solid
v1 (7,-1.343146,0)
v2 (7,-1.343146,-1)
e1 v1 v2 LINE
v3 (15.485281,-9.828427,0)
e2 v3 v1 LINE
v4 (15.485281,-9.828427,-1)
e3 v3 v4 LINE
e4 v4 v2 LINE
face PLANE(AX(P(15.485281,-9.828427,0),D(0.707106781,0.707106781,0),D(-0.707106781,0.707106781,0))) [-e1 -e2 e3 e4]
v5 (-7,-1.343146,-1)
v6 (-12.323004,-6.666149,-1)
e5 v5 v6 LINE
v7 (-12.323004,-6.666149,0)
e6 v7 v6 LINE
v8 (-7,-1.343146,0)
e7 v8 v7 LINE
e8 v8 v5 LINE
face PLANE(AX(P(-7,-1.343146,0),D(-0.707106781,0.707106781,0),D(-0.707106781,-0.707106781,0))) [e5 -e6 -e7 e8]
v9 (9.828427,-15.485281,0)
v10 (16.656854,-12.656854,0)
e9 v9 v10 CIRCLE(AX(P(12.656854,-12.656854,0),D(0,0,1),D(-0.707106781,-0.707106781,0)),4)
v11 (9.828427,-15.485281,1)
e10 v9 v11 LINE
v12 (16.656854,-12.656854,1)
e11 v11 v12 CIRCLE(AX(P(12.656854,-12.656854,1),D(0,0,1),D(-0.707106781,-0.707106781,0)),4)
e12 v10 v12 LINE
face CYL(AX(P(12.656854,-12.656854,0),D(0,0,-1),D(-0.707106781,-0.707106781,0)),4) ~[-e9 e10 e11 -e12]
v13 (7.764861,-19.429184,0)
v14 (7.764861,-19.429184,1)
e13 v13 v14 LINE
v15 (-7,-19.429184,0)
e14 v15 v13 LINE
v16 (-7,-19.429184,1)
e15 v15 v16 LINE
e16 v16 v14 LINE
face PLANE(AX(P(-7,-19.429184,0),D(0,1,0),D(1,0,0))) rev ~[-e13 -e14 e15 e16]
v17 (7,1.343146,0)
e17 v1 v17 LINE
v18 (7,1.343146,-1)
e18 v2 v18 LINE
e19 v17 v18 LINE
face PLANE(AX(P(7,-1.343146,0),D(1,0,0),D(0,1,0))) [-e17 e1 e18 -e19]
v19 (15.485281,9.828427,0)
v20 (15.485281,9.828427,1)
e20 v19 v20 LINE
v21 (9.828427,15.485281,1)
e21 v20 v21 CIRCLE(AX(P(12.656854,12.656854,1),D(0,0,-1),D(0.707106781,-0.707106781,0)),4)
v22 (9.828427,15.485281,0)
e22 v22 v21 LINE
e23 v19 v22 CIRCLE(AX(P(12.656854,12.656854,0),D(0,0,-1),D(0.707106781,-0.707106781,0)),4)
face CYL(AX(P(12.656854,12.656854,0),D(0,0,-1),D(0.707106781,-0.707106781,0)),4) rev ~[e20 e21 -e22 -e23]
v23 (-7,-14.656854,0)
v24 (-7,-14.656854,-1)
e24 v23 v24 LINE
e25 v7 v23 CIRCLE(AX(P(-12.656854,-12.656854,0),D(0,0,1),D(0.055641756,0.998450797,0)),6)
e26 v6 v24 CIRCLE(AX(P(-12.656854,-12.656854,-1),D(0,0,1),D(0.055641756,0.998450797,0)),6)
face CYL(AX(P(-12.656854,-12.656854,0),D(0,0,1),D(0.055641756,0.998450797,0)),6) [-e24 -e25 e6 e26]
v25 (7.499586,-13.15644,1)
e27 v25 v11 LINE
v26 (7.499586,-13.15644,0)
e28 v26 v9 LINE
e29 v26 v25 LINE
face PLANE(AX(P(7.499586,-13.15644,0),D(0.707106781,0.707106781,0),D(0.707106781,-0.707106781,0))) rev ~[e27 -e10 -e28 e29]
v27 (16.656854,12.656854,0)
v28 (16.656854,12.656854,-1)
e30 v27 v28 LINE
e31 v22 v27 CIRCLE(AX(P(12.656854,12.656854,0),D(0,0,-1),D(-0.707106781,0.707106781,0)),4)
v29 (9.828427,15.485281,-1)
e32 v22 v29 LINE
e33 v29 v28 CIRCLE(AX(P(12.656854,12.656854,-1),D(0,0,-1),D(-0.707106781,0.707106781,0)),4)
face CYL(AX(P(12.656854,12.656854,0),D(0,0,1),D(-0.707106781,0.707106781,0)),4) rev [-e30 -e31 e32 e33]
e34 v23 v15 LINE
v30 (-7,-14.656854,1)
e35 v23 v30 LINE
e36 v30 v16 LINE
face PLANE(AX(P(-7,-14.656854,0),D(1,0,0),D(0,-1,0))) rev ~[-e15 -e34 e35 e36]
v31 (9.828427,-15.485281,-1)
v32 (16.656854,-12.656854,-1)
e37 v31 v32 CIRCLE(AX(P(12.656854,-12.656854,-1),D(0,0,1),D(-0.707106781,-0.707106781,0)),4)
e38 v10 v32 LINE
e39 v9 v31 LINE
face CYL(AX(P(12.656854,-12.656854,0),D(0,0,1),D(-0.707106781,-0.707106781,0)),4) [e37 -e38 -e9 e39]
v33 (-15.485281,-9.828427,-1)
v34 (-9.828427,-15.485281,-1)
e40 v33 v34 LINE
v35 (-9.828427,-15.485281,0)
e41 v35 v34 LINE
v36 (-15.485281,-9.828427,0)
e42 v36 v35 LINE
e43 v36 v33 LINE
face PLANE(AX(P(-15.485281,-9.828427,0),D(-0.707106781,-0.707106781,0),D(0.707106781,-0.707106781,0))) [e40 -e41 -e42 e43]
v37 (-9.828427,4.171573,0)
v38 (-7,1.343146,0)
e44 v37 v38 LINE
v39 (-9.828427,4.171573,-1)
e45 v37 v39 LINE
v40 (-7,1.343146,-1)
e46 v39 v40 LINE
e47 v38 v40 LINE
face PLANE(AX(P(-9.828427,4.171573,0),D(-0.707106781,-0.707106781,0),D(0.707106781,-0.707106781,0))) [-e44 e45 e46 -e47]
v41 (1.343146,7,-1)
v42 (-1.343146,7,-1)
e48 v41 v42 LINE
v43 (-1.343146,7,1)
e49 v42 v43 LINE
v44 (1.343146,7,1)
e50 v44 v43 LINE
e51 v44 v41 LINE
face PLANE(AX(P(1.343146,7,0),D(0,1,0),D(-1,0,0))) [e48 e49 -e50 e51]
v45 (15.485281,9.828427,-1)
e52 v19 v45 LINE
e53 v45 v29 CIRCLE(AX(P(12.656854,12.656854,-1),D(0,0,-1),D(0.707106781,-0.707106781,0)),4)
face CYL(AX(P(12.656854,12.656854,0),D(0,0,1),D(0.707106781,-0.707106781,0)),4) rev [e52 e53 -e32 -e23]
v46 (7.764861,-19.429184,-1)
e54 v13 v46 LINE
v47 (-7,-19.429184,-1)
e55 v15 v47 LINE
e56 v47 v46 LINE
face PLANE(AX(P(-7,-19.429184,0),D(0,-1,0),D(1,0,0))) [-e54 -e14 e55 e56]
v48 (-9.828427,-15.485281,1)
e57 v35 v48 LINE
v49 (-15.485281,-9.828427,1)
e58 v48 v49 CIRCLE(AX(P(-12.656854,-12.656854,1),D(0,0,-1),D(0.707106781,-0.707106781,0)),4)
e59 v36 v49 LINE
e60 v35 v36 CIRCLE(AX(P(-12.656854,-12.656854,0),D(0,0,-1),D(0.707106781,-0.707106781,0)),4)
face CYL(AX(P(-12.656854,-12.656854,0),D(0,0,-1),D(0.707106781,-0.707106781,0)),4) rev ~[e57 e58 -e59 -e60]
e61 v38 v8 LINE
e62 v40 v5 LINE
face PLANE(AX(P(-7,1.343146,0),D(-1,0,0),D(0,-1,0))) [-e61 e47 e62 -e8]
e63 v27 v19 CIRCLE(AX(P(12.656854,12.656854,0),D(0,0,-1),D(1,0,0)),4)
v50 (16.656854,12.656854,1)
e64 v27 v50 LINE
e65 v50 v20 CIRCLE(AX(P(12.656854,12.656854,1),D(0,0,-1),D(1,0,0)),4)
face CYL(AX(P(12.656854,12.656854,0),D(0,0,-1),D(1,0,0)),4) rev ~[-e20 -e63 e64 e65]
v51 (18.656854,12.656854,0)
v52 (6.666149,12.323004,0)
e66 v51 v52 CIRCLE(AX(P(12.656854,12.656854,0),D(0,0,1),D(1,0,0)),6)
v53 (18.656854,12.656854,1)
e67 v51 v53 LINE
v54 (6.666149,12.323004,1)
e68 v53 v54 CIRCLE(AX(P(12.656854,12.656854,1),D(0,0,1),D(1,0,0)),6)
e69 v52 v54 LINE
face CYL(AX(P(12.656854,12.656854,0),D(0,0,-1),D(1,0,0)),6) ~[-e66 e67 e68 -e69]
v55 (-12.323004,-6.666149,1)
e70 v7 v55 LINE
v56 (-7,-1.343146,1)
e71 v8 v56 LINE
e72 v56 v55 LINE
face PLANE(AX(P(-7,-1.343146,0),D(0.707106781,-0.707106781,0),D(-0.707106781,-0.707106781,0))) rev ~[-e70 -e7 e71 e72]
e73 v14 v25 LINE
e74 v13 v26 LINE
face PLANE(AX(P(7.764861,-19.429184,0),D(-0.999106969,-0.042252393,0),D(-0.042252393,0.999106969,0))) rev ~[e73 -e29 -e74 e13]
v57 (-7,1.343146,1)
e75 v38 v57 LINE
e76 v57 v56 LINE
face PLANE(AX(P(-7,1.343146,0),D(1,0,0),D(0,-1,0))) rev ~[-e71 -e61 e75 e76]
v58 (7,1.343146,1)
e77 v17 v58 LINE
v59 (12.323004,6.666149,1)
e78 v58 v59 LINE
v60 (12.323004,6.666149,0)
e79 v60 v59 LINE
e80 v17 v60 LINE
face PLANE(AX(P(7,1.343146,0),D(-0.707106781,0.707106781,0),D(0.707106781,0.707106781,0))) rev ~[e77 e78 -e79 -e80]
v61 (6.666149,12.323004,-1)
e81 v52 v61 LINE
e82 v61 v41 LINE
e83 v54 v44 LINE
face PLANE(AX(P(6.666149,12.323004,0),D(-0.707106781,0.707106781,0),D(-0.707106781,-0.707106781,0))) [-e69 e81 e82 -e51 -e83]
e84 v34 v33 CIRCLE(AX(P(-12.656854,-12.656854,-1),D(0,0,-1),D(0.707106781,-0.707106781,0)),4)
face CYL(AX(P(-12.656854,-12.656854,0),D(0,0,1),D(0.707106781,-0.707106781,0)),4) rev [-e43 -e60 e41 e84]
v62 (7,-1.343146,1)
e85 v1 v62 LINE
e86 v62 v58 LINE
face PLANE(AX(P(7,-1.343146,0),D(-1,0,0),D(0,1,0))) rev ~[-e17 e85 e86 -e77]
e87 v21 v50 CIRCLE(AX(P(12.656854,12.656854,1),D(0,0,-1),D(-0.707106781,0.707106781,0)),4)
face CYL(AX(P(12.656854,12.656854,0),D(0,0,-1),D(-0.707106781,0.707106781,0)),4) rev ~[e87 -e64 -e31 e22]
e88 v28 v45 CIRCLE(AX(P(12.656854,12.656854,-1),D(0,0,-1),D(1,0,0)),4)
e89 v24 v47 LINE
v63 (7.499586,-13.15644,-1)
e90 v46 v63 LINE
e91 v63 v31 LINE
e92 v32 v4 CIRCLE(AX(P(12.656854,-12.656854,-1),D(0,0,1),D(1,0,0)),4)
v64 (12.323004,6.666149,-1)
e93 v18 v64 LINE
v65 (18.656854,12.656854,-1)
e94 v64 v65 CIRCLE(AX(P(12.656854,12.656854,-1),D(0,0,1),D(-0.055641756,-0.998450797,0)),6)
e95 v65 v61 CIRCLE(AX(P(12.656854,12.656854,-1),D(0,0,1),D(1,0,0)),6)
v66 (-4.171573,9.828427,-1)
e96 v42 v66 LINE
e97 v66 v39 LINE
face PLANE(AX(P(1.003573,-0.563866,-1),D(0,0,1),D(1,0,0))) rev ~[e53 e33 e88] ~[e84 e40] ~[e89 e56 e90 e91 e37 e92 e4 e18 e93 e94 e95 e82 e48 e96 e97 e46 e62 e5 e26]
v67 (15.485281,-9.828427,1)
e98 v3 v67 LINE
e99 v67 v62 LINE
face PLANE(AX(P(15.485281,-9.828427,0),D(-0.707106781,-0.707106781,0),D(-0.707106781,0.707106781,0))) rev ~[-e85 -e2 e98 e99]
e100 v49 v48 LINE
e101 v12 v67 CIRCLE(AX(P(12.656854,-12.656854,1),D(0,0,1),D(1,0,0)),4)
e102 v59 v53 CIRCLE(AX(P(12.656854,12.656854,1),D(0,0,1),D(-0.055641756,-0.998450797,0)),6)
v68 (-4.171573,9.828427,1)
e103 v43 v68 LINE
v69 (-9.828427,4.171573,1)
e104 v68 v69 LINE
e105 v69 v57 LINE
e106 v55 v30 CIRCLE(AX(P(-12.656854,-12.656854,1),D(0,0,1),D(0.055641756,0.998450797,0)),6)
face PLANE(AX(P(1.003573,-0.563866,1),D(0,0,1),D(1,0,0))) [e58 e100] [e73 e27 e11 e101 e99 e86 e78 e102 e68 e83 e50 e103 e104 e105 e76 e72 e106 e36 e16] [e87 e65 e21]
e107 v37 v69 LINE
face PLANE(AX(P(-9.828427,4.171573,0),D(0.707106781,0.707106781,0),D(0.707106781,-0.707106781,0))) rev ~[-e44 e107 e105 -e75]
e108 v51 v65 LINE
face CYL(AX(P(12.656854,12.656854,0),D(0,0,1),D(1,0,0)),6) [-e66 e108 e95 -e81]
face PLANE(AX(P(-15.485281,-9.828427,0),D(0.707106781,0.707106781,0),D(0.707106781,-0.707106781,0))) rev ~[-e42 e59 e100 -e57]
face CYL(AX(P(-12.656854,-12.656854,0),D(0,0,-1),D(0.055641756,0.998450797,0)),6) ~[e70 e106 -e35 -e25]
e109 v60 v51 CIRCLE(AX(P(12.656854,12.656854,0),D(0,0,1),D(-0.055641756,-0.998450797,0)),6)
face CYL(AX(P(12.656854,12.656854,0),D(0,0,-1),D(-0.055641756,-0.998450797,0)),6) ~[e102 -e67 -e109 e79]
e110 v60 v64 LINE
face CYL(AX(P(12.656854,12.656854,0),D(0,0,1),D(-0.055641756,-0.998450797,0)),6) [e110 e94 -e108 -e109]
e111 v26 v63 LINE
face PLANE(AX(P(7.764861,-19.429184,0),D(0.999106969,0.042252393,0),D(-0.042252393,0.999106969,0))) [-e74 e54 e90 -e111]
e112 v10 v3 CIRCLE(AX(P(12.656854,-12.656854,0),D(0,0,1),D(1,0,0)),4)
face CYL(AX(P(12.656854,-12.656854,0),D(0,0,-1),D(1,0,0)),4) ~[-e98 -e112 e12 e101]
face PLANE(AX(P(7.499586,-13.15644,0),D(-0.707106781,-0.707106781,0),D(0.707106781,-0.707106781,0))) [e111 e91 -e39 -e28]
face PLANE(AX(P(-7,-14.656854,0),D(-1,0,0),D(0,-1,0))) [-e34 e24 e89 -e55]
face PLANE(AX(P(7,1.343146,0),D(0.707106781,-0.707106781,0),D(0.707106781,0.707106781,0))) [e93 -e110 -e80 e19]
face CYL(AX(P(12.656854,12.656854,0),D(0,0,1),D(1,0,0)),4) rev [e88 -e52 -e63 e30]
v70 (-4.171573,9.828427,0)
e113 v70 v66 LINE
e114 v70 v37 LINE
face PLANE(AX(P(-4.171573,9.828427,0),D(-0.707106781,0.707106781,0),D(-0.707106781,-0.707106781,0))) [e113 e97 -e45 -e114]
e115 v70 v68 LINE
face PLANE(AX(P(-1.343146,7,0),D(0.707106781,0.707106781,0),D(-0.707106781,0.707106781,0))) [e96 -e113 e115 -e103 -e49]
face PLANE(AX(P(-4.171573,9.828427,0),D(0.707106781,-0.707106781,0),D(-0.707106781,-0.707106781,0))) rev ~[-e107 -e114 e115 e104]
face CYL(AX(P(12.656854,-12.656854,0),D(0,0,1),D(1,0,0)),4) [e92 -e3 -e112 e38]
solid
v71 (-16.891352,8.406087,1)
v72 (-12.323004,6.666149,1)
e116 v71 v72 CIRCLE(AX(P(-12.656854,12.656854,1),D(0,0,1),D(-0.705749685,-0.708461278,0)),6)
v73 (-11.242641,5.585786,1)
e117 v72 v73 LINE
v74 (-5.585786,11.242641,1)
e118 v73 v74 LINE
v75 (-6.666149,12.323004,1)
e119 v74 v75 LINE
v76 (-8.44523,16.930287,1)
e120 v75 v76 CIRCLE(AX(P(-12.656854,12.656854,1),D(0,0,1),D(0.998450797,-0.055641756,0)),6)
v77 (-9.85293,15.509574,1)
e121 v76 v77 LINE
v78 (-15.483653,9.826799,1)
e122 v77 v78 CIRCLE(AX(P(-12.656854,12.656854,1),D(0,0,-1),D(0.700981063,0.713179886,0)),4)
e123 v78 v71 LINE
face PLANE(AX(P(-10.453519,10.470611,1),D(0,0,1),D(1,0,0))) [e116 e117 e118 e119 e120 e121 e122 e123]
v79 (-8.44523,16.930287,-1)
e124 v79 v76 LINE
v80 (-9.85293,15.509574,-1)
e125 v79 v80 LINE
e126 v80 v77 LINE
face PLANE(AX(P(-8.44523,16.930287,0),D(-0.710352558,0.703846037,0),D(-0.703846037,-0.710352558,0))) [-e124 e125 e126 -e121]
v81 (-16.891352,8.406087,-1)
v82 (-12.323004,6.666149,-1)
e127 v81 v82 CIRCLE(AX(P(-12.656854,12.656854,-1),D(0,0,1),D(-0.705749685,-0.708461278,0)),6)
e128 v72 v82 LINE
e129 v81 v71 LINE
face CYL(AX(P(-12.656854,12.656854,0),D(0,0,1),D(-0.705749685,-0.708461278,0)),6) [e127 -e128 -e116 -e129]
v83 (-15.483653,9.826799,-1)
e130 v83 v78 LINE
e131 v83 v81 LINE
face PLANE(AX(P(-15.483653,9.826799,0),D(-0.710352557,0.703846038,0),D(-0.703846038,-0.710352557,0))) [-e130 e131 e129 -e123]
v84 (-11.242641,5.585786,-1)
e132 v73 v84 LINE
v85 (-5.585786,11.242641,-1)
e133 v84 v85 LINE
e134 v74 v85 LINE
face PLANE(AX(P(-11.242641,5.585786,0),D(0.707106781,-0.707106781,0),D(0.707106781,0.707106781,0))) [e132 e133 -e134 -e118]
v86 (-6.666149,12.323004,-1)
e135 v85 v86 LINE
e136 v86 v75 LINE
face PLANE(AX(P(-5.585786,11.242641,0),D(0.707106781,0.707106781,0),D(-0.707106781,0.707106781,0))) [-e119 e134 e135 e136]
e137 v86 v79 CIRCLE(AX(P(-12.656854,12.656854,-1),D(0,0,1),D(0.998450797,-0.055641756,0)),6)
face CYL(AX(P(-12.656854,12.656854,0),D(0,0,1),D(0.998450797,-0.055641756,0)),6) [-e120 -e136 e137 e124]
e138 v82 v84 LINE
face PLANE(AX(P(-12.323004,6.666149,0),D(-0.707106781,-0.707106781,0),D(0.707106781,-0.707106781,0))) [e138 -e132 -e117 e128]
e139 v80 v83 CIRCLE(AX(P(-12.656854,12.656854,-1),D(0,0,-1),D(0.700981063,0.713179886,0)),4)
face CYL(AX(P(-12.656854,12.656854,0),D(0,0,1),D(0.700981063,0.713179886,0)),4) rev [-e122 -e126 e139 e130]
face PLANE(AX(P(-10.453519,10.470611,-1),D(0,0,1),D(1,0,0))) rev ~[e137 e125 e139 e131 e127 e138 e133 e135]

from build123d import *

# Parameters (mm, degrees)
F1_DEPTH = 1


# Not quite as in the source:
# - ends of sketch curves that miss each other by under 0.0002 mm in the source are joined


with BuildPart() as f1:
    # F0 (on Top) → F1 (new body, symmetric)
    with BuildSketch(Plane.XY):
        with BuildLine():
            Line((1.3431457505, 7), (-1.3431457505, 7))
            Line((-1.3431457505, 7), (-4.1715728753, 9.8284271247))
            Line((-4.1715728753, 9.8284271247), (-9.8284271247, 4.1715728753))
            Line((-9.8284271247, 4.1715728753), (-7, 1.3431457505))
            Line((-7, 1.3431457505), (-7, -1.3431457505))
            Line((-7, -1.3431457505), (-7, -12.6568542495))
            Line((-7, -12.6568542495), (-6.6661494646, -12.3230037141))
            Line((-6.6661494646, -12.3230037141), (-1.3431457505, -7))
            Line((-1.3431457505, -7), (1.3431457505, -7))
            Line((1.3431457505, -7), (7.4995861066, -13.1564403561))
            Line((7.4995861066, -13.1564403561), (7, -1.3431457505))
            Line((7, -1.3431457505), (7, 1.3431457505))
            Line((7, 1.3431457505), (12.3230037141, 6.6661494646))
            ThreePointArc((12.3230037141, 6.6661494646), (8.4142135624, 8.4142135624), (6.6661494646, 12.3230037141))
            Line((6.6661494646, 12.3230037141), (1.3431457505, 7))
        make_face()
        with BuildLine():
            ThreePointArc((18.6568542495, 12.6568542495), (12.4898642939, 18.6545299955), (6.6661494646, 12.3230037141))
            Line((6.6661494646, 12.3230037141), (9.8284271247, 15.4852813742))
            ThreePointArc((9.8284271247, 15.4852813742), (14.187587979, 16.3523723795), (16.6568542495, 12.6568542495))
            ThreePointArc((16.6568542495, 12.6568542495), (16.3523723795, 11.12612052), (15.4852813742, 9.8284271247))
            Line((15.4852813742, 9.8284271247), (12.3230037141, 6.6661494646))
            ThreePointArc((12.3230037141, 6.6661494646), (16.7797717109, 8.2977773281), (18.6568542495, 12.6568542495))
        make_face()
        with BuildLine():
            Line((9.8284271247, 15.4852813742), (6.6661494646, 12.3230037141))
            ThreePointArc((6.6661494646, 12.3230037141), (8.4142135624, 8.4142135624), (12.3230037141, 6.6661494646))
            Line((12.3230037141, 6.6661494646), (15.4852813742, 9.8284271247))
            ThreePointArc((15.4852813742, 9.8284271247), (9.8284271247, 9.8284271247), (9.8284271247, 15.4852813742))
        make_face()
        Polygon((-7, -12.6568542495), (-7, -1.3431457505), (-12.3230037141, -6.6661494646), (-15.4852813742, -9.8284271247), (-9.8284271247, -15.4852813742), align=None)
        with BuildLine():
            Line((15.4852813742, -9.8284271247), (7, -1.3431457505))
            Line((7, -1.3431457505), (7.4995861066, -13.1564403561))
            Line((7.4995861066, -13.1564403561), (9.8284271247, -15.4852813742))
            ThreePointArc((9.8284271247, -15.4852813742), (9.8284271247, -9.8284271247), (15.4852813742, -9.8284271247))
        make_face()
        with BuildLine():
            Line((-15.4852813742, -9.8284271247), (-12.3230037141, -6.6661494646))
            ThreePointArc((-12.3230037141, -6.6661494646), (-17.6503476854, -15.9832672282), (-7, -14.6568542495))
            Line((-7, -14.6568542495), (-7, -12.6568542495))
            Line((-7, -12.6568542495), (-9.8284271247, -15.4852813742))
            ThreePointArc((-9.8284271247, -15.4852813742), (-15.4852813742, -15.4852813742), (-15.4852813742, -9.8284271247))
        make_face()
        with BuildLine():
            Line((-6.6661494646, -12.3230037141), (-7, -12.6568542495))
            Line((-7, -12.6568542495), (-7, -14.6568542495))
            ThreePointArc((-7, -14.6568542495), (-6.717315341, -13.5064880262), (-6.6661494646, -12.3230037141))
        make_face()
        with BuildLine():
            ThreePointArc((16.6568542495, -12.6568542495), (16.3523723795, -11.12612052), (15.4852813742, -9.8284271247))
            Line((15.4852813742, -9.8284271247), (9.8284271247, -15.4852813742))
            ThreePointArc((9.8284271247, -15.4852813742), (14.187587979, -16.3523723795), (16.6568542495, -12.6568542495))
        make_face()
        with BuildLine():
            Line((9.8284271247, -15.4852813742), (15.4852813742, -9.8284271247))
            ThreePointArc((15.4852813742, -9.8284271247), (9.8284271247, -9.8284271247), (9.8284271247, -15.4852813742))
        make_face()
        with BuildLine():
            Line((7.7648614533, -19.4291844964), (7.4995861066, -13.1564403561))
            Line((7.4995861066, -13.1564403561), (1.3431457505, -7))
            Line((1.3431457505, -7), (-1.3431457505, -7))
            Line((-1.3431457505, -7), (-6.6661494646, -12.3230037141))
            ThreePointArc((-6.6661494646, -12.3230037141), (-6.717315341, -13.5064880262), (-7, -14.6568542495))
            Line((-7, -14.6568542495), (-7, -19.4291844964))
            Line((-7, -19.4291844964), (7.7648614533, -19.4291844964))
        make_face()
    extrude(amount=F1_DEPTH, both=True)


with BuildPart() as f1b:
    # F0 (on Top) → F1, piece 2 (new body, symmetric)
    with BuildSketch(Plane.XY):
        with BuildLine():
            Line((-5.5857864376, 11.2426406871), (-6.6661494646, 12.3230037141))
            ThreePointArc((-6.6661494646, 12.3230037141), (-7.059654803, 14.8181867913), (-8.4452303219, 16.9302865811))
            Line((-8.4452303219, 16.9302865811), (-9.8529299986, 15.5095737932))
            ThreePointArc((-9.8529299986, 15.5095737932), (-9.8154440182, 9.841470102), (-15.483652679, 9.8267993668))
            Line((-15.483652679, 9.8267993668), (-16.8913523576, 8.4060865808))
            ThreePointArc((-16.8913523576, 8.4060865808), (-14.7924122945, 7.0497701734), (-12.3230037141, 6.6661494646))
            Line((-12.3230037141, 6.6661494646), (-11.2426406871, 5.5857864376))
            Line((-11.2426406871, 5.5857864376), (-5.5857864376, 11.2426406871))
        make_face()
    extrude(amount=F1_DEPTH, both=True)


solid = Compound([f1.part, f1b.part])
